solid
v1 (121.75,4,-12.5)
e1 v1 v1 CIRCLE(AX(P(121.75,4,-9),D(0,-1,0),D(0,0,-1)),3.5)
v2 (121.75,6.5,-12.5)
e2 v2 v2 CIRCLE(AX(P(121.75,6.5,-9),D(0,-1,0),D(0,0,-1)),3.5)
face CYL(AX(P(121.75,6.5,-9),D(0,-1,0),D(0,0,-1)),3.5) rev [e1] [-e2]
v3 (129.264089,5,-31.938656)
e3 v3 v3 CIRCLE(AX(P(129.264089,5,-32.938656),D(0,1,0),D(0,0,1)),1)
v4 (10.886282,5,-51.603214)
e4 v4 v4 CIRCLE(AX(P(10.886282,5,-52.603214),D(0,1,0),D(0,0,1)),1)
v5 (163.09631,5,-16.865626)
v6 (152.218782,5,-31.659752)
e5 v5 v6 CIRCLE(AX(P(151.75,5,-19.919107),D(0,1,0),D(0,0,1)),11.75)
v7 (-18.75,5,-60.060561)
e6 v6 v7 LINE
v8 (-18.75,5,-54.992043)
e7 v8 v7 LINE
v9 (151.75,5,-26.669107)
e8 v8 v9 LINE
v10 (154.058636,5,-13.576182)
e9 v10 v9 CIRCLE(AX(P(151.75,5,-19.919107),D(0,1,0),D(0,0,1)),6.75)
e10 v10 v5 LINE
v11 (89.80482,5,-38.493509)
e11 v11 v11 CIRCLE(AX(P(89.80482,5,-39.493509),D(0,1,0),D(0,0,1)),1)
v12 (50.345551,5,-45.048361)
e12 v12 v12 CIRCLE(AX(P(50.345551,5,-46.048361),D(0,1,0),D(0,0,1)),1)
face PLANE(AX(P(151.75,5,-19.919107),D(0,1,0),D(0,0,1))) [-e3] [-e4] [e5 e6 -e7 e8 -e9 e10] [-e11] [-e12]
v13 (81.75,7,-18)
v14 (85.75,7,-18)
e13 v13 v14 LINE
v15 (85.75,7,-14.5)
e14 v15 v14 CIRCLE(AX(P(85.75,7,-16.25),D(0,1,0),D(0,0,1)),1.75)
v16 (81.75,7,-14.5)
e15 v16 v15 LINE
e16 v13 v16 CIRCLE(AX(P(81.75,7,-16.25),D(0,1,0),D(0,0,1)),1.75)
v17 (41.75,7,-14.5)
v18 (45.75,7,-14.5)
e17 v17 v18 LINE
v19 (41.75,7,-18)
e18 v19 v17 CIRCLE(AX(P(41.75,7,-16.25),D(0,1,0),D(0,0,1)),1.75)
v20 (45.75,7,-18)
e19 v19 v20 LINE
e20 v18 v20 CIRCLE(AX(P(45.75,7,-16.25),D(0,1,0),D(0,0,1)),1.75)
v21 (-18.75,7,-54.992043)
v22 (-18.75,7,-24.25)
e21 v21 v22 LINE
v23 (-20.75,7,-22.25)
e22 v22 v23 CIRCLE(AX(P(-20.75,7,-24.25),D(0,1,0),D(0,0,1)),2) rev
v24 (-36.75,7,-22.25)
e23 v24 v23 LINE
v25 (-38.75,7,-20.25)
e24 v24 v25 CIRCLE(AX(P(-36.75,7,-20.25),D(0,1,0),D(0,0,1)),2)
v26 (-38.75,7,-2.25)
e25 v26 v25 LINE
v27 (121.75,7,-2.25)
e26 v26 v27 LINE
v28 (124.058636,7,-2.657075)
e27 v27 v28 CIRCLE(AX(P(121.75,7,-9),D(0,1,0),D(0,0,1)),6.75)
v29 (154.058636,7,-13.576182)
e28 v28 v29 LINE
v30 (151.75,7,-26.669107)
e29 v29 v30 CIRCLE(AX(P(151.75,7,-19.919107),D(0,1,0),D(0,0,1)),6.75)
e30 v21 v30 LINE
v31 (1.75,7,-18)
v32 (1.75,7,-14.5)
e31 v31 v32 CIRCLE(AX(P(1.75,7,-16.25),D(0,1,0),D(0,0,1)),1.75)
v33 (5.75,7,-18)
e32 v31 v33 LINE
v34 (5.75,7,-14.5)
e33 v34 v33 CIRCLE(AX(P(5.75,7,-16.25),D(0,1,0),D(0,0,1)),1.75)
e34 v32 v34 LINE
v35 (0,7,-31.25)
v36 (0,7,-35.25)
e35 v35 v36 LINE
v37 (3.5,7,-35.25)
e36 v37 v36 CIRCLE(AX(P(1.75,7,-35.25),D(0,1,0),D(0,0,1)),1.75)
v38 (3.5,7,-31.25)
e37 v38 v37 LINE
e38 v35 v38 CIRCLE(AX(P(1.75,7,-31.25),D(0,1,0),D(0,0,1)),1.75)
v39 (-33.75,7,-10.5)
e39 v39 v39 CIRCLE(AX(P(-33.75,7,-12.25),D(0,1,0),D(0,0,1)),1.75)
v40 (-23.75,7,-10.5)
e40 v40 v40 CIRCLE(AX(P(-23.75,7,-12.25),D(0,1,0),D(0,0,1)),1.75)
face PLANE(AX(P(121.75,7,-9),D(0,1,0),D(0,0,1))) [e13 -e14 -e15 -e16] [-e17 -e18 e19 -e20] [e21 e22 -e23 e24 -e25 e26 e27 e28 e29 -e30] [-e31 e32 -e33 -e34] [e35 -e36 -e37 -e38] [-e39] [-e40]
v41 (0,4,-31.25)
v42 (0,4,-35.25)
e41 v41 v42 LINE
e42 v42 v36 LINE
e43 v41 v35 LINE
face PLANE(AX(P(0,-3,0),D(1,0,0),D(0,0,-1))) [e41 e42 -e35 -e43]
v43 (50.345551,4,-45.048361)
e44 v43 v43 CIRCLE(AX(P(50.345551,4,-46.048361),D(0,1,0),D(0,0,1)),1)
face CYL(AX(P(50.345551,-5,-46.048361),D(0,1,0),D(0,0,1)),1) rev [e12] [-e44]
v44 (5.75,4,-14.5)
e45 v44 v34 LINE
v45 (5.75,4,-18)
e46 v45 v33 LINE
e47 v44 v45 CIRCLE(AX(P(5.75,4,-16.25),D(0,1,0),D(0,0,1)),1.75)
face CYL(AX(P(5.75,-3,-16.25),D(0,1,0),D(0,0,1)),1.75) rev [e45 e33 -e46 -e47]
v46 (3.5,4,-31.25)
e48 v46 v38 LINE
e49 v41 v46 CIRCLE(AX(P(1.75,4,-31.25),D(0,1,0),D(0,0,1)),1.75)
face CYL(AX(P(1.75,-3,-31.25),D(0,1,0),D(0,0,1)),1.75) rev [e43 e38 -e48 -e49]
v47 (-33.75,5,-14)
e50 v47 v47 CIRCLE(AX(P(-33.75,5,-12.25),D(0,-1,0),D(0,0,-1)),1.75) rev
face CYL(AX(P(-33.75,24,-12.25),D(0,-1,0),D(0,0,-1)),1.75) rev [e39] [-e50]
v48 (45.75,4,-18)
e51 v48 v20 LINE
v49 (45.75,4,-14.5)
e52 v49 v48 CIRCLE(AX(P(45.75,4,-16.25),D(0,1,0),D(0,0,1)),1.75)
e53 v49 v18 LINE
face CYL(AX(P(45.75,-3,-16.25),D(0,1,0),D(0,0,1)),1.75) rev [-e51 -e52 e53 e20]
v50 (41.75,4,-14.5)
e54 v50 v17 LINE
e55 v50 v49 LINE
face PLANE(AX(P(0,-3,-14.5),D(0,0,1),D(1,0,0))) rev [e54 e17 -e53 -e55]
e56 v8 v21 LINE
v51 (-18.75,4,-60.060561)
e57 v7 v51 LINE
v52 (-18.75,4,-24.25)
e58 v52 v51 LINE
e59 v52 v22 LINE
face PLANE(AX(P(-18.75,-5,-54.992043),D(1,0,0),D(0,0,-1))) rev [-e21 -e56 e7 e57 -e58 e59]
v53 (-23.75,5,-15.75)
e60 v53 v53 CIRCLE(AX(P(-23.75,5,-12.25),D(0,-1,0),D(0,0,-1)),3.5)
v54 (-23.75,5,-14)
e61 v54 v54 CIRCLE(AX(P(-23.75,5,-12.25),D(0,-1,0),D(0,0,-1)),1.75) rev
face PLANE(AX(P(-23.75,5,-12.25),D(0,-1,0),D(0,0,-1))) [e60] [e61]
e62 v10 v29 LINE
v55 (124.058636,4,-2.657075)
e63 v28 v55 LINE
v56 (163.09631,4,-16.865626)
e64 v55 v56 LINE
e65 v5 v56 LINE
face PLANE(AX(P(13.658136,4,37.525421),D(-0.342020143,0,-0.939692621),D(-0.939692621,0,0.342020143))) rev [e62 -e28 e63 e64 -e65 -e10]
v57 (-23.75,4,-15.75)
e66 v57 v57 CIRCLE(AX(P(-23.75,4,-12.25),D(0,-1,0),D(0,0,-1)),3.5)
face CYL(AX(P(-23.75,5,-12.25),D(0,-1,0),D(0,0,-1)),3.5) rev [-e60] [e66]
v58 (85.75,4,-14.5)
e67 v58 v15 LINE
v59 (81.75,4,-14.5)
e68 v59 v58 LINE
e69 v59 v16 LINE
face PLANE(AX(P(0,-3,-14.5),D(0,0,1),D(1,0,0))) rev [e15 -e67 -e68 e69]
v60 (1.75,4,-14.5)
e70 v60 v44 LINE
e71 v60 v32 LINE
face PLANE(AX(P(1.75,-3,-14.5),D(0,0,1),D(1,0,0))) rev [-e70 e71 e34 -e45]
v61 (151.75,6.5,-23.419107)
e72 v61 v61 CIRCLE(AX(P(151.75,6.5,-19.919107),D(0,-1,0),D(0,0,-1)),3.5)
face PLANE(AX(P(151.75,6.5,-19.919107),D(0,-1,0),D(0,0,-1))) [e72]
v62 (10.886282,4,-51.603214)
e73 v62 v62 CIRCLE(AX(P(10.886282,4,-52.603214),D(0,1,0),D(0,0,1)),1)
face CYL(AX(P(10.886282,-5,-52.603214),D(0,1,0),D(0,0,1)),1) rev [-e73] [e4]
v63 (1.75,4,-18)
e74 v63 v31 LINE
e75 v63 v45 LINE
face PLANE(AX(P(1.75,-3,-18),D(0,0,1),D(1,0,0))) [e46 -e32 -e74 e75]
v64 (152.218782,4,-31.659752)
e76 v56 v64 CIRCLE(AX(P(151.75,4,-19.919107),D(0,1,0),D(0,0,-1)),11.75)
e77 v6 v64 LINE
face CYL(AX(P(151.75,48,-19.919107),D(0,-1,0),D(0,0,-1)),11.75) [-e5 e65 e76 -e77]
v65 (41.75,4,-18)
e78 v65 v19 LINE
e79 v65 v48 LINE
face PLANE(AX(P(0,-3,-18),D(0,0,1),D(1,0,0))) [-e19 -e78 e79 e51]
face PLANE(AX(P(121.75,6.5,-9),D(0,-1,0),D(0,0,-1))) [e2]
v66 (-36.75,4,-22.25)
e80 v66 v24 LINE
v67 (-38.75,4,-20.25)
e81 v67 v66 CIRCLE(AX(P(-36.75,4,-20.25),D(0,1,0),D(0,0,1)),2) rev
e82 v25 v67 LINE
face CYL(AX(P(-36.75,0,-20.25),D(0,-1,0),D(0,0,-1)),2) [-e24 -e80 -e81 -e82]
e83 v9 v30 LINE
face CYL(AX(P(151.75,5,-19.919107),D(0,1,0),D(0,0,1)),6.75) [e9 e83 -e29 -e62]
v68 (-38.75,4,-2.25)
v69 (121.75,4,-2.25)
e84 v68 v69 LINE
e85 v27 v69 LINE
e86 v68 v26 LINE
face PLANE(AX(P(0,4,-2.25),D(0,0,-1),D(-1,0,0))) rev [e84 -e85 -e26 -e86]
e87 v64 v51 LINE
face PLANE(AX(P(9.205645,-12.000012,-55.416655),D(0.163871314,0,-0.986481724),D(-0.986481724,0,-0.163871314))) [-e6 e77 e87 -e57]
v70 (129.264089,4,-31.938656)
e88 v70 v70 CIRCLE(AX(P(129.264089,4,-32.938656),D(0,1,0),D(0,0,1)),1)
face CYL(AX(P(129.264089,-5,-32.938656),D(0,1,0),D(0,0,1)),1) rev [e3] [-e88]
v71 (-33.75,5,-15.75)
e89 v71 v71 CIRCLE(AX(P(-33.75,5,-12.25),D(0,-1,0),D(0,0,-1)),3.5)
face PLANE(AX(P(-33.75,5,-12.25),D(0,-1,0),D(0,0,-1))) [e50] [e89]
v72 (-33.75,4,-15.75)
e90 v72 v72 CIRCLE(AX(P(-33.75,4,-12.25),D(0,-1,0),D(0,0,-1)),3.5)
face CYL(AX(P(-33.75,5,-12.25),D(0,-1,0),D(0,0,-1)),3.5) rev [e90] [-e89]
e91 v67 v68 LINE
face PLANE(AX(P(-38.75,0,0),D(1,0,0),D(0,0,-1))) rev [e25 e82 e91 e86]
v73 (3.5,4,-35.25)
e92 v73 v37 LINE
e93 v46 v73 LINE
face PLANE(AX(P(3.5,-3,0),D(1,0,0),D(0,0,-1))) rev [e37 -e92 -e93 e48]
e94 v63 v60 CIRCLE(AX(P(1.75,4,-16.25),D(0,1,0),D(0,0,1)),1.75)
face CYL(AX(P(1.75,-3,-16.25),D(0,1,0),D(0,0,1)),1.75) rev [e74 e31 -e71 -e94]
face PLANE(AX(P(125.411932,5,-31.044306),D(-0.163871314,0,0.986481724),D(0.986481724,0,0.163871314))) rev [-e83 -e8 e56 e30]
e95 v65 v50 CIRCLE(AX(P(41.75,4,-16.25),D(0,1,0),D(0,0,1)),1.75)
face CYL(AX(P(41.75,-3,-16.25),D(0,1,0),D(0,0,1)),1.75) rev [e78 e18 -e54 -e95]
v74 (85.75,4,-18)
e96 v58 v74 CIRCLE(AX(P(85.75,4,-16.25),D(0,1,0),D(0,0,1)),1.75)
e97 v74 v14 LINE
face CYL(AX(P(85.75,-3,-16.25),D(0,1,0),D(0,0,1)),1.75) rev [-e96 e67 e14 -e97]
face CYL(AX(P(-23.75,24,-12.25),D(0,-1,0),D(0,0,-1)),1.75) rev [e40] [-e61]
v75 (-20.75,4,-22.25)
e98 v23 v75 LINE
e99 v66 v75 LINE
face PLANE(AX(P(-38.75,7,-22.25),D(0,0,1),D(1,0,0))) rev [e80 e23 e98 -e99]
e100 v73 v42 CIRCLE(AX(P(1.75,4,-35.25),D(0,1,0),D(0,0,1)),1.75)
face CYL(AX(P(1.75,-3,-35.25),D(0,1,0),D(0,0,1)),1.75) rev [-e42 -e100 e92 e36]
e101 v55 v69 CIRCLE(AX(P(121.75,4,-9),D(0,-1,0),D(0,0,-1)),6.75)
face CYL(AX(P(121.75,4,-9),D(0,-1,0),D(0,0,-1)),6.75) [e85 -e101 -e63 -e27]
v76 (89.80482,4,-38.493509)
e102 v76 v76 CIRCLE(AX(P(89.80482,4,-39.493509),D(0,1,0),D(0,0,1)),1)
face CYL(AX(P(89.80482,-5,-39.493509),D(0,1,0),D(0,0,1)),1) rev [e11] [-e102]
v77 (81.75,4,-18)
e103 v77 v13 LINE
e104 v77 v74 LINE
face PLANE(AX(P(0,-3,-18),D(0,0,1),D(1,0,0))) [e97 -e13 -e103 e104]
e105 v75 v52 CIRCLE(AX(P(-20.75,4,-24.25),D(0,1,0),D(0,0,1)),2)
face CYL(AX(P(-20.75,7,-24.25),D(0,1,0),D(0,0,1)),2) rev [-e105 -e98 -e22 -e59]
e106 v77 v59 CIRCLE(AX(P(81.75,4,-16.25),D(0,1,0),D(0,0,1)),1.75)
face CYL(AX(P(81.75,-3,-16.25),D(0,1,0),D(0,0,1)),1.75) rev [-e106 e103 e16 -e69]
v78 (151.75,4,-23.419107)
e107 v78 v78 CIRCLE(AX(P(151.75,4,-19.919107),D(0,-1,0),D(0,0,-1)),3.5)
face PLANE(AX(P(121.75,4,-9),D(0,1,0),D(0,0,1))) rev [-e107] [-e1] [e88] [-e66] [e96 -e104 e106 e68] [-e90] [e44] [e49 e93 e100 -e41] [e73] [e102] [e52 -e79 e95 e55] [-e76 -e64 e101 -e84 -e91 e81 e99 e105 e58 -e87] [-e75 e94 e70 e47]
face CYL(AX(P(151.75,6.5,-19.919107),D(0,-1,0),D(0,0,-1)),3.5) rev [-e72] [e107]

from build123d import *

# Parameters (mm, degrees)
SKETCH_1_W                = 35
SKETCH_1_H                = 55
EXTRUDE_1_DEPTH           = 1
EXTRUDE_2_DEPTH           = 3
SKETCH_3_R                = 5
CUT_EXTRUDE_1_DEPTH       = 169.569903897
SKETCH_4_R                = 4
CUT_EXTRUDE_2_DEPTH       = 2
SKETCH_5_R                = 2
CUT_EXTRUDE_3_DEPTH       = 2
EXTRUDE_START             = 7
EXTRUDE_3_DEPTH           = 7
CUT_EXTRUDE_START         = -1.5
SKETCH_9_W                = 10
SKETCH_9_H                = 26
CUT_EXTRUDE_4_DEPTH       = 168.318874833
SKETCH_10_R               = 1.5
CUT_EXTRUDE_5_DEPTH       = 194.595583627
EXTRUDE_4_DEPTH           = 3
SKETCH_13_W               = 334.012533363
SKETCH_13_H               = 161.456209481
CUT_EXTRUDE_6_DEPTH       = 10
SKETCH_14_R               = 3.5
CUT_EXTRUDE_7_DEPTH       = 2.5
SKETCH_15_R               = 5
CUT_EXTRUDE_8_DEPTH       = 179.854165453
EXTRUDE_START_2           = 16
EXTRUDE_5_DEPTH           = 16
EXTRUDE_6_DEPTH           = 7
SKETCH_19_W               = 10
SKETCH_19_H               = 26
CUT_EXTRUDE_9_DEPTH       = 180.209193181
SKETCH_20_R               = 1.5
CUT_EXTRUDE_10_DEPTH      = 175.844216376
THREAD_1_PITCH            = 0.6
CUT_EXTRUDE_11_DEPTH      = 181.709193232
SKETCH_22_W               = 13
SKETCH_22_H               = 1.5
CUT_EXTRUDE_12_DEPTH      = 7
SKETCH_23_R               = 5
EXTRUDE_7_DEPTH           = 2
CUT_EXTRUDE_START_2       = -3
CUT_EXTRUDE_15_DEPTH      = 177.762490825
SKETCH_25_R               = 7.5
CUT_EXTRUDE_16_DEPTH      = 4
CUT_EXTRUDE_17_DEPTH      = 10
SKETCH_27_R               = 1.75
CUT_EXTRUDE_18_DEPTH      = 10
CUT_EXTRUDE_19_DEPTH      = 180.762490825
CUT_EXTRUDE_19_DEPTH_BACK = 60
CUT_EXTRUDE_20_DEPTH      = 2
SKETCH_30_W               = 11.653427307
SKETCH_30_H               = 7.287785495
CUT_EXTRUDE_21_DEPTH      = 193.522031886
SKETCH_31_W               = 3.751946438
SKETCH_31_H               = 6.76496914
CUT_EXTRUDE_22_DEPTH      = 10
SKETCH_32_R               = 1
CUT_EXTRUDE_23_DEPTH      = 10
SKETCH_33_R               = 6.599468503
EXTRUDE_8_DEPTH           = 1
SKETCH_34_W               = 94.741371682
SKETCH_34_H               = 17.469135828
CUT_EXTRUDE_25_DEPTH      = 330
SKETCH_35_W               = 20
SKETCH_35_H               = 3
EXTRUDE_9_DEPTH           = 20
SKETCH_36_R               = 1.75
CUT_EXTRUDE_26_DEPTH      = 20
SKETCH_37_R               = 3.5
CUT_EXTRUDE_27_DEPTH      = 1
FILLET_1_R                = 2


with BuildPart() as part:
    # Sketch 1 → 凸台-拉伸1 (new body)
    with BuildSketch(Plane(origin=(0, 0, 0), x_dir=(1, 0, 0), z_dir=(0, 1, 0))):
        Rectangle(SKETCH_1_W, SKETCH_1_H)
    extrude(amount=EXTRUDE_1_DEPTH)

    # 草图2 → 凸台-拉伸2 (add)
    with BuildSketch(Plane(origin=(0, 1, 0), x_dir=(1, 0, 0), z_dir=(0, 1, 0))):
        with BuildLine():
            Line((106.75, -2.25), (106.75, 2.25))
            Line((106.75, 2.25), (121.75, 2.25))
            ThreePointArc((121.75, 2.25), (122.922125199, 2.352547667), (124.058635967, 2.65707481))
            Line((124.058635967, 2.65707481), (154.058635967, 13.576181838))
            ThreePointArc((154.058635967, 13.576181838), (158.397452333, 21.091232227), (151.75, 26.669107028))
            Line((151.75, 26.669107028), (-31.447415548, 57.101298968))
            ThreePointArc((-31.447415548, 57.101298968), (-37.800418235, 56.264673928), (-42.609265279, 52.029632639))
            Line((-42.609265279, 52.029632639), (-60.161792173, 23.605896086))
            ThreePointArc((-60.161792173, 23.605896086), (-61.717833724, 20.073278016), (-62.25, 16.25))
            Line((-62.25, 16.25), (-62.25, -16.25))
            ThreePointArc((-62.25, -16.25), (-61.717833724, -20.073278016), (-60.161792173, -23.605896086))
            Line((-60.161792173, -23.605896086), (-42.609265279, -52.029632639))
            ThreePointArc((-42.609265279, -52.029632639), (-37.800418235, -56.264673928), (-31.447415548, -57.101298968))
            Line((-31.447415548, -57.101298968), (151.75, -26.669107028))
            ThreePointArc((151.75, -26.669107028), (158.397452333, -21.091232227), (154.058635967, -13.576181838))
            Line((154.058635967, -13.576181838), (124.058635967, -2.65707481))
            ThreePointArc((124.058635967, -2.65707481), (122.922125199, -2.352547667), (121.75, -2.25))
            Line((121.75, -2.25), (106.75, -2.25))
        make_face()
    extrude(amount=EXTRUDE_2_DEPTH)

    # 草图3 → 切除-拉伸1 (cut, through all)
    with BuildSketch(Plane(origin=(0, 4, 0), x_dir=(1, 0, 0), z_dir=(0, 1, 0))):
        with Locations(Location((-48.25, 16.25, 0), (0, 0, 270))):
            Circle(SKETCH_3_R)
        with Locations(Location((-48.25, -16.25, 0), (0, 0, 270))):
            Circle(SKETCH_3_R)
    extrude(amount=-CUT_EXTRUDE_1_DEPTH, mode=Mode.SUBTRACT)

    # 草图4 → 切除-拉伸2 (cut)
    with BuildSketch(Plane(origin=(0, 4, 0), x_dir=(1, 0, 0), z_dir=(0, 1, 0))):
        with Locations(Location((-33.25, 46.25, 0), (0, 0, 270))):
            Circle(SKETCH_4_R)
        with Locations(Location((-33.25, -46.25, 0), (0, 0, 270))):
            Circle(SKETCH_4_R)
    extrude(amount=-CUT_EXTRUDE_2_DEPTH, mode=Mode.SUBTRACT)

    # 草图5 → 切除-拉伸3 (cut)
    with BuildSketch(Plane(origin=(0, 4, 0), x_dir=(1, 0, 0), z_dir=(0, 1, 0))):
        with Locations(Location((121.75, 9, 0), (0, 0, 270))):
            Circle(SKETCH_5_R)
        with Locations(Location((121.75, -9, 0), (0, 0, 270))):
            Circle(SKETCH_5_R)
        with Locations(Location((151.75, 19.919107028, 0), (0, 0, 270))):
            Circle(SKETCH_5_R)
        with Locations(Location((151.75, -19.919107028, 0), (0, 0, 270))):
            Circle(SKETCH_5_R)
    extrude(amount=-CUT_EXTRUDE_3_DEPTH, mode=Mode.SUBTRACT)

    # 草图8 → 凸台-拉伸3 (add)
    with BuildSketch(Plane.XZ.offset(-1).offset(EXTRUDE_START)):
        with BuildLine():
            Line((-26.75, -26.25), (-39.75, -26.25))
            Line((-39.75, -26.25), (-39.75, -55.124119675))
            ThreePointArc((-39.75, -55.124119675), (-35.798281322, -56.950759894), (-31.447415548, -57.101298968))
            Line((-31.447415548, -57.101298968), (-26.75, -56.320978726))
            Line((-26.75, -56.320978726), (-26.75, -26.25))
        make_face()
    extrude_3 = extrude(amount=-EXTRUDE_3_DEPTH)

    # 镜向1: 凸台-拉伸3 across plane
    add(extrude_3.mirror(Plane.XY))

    # 草图9 → 切除-拉伸4 (cut, through all)
    with BuildSketch(Plane.XZ.offset(6).offset(CUT_EXTRUDE_START)):
        with Locations((-33.25, -40.75)):
            Rectangle(SKETCH_9_W, SKETCH_9_H)
    cut_extrude_4 = extrude(amount=-CUT_EXTRUDE_4_DEPTH, mode=Mode.SUBTRACT)

    # 镜向2: 切除-拉伸4 across plane
    add(cut_extrude_4.mirror(Plane.XY), mode=Mode.SUBTRACT)

    # 草图10 → 切除-拉伸5 (cut, through all)
    with BuildSketch(Plane.XY.offset(-53.75)):
        with Locations((-33.25, -1.5)):
            Circle(SKETCH_10_R)
    cut_extrude_5 = extrude(amount=-CUT_EXTRUDE_5_DEPTH, mode=Mode.SUBTRACT)

    # 镜向3: 切除-拉伸5 across plane
    add(cut_extrude_5.mirror(Plane.XY), mode=Mode.SUBTRACT)

    # 草图12 → 凸台-拉伸4 (add)
    with BuildSketch(Plane(origin=(0, 4, 0), x_dir=(1, 0, 0), z_dir=(0, 1, 0))):
        with BuildLine():
            Line((152.536154407, 34.648141662), (-30.136445037, 64.993152763))
            ThreePointArc((-30.136445037, 64.993152763), (-32.296727103, 65.226071005), (-34.469475839, 65.210824842))
            Line((-34.469475839, 65.210824842), (-60.161792173, 23.605896086))
            ThreePointArc((-60.161792173, 23.605896086), (-61.717833724, 20.073278016), (-62.25, 16.25))
            Line((-62.25, 16.25), (-62.25, 2.25))
            Line((-62.25, 2.25), (121.75, 2.25))
            ThreePointArc((121.75, 2.25), (122.922125199, 2.352547667), (124.058635967, 2.65707481))
            Line((124.058635967, 2.65707481), (166.382589153, 18.061733966))
            ThreePointArc((166.382589153, 18.061733966), (163.073058037, 29.371665237), (152.536154407, 34.648141662))
        make_face()
    extrude(amount=EXTRUDE_4_DEPTH)

    # 草图13 → 切除-拉伸6 (cut)
    with BuildSketch(Plane.XZ.offset(-4)):
        with Locations((47.836319436, 6.16656882)):
            Rectangle(SKETCH_13_W, SKETCH_13_H)
    extrude(amount=CUT_EXTRUDE_6_DEPTH, mode=Mode.SUBTRACT)

    # 草图14 → 切除-拉伸7 (cut)
    with BuildSketch(Plane.XZ.offset(-4)):
        with Locations(Location((151.75, -19.919107028, 0), (0, 0, 270))):
            Circle(SKETCH_14_R)
        with Locations(Location((121.75, -9, 0), (0, 0, 270))):
            Circle(SKETCH_14_R)
    extrude(amount=-CUT_EXTRUDE_7_DEPTH, mode=Mode.SUBTRACT)

    # 草图15 → 切除-拉伸8 (cut, through all)
    with BuildSketch(Plane.XZ.offset(-4)):
        with Locations(Location((-48.25, -16.25, 0), (0, 0, 270))):
            Circle(SKETCH_15_R)
    extrude(amount=-CUT_EXTRUDE_8_DEPTH, mode=Mode.SUBTRACT)

    # 草图17 → 凸台-拉伸5 (add)
    with BuildSketch(Plane.XZ.offset(-4).offset(EXTRUDE_START_2)):
        with BuildLine():
            Line((-30.628058978, -62.03370759), (152.218782473, -31.659751942))
            ThreePointArc((152.218782473, -31.659751942), (161.216553887, -26.879484712), (163.096310198, -16.865626245))
            Line((163.096310198, -16.865626245), (166.382589153, -18.061733966))
            ThreePointArc((166.382589153, -18.061733966), (163.073058037, -29.371665237), (152.536154407, -34.648141662))
            Line((152.536154407, -34.648141662), (-30.136445037, -64.993152763))
            ThreePointArc((-30.136445037, -64.993152763), (-32.296727103, -65.226071005), (-34.469475839, -65.210824842))
            Line((-34.469475839, -65.210824842), (-36.504423199, -61.915526791))
            ThreePointArc((-36.504423199, -61.915526791), (-33.571714316, -62.246765295), (-30.628058978, -62.03370759))
        make_face()
    extrude(amount=-EXTRUDE_5_DEPTH)

    # 草图18 → 凸台-拉伸6 (add)
    with BuildSketch(Plane(origin=(0, 7, 0), x_dir=(1, 0, 0), z_dir=(0, 1, 0))):
        with BuildLine():
            Line((-39.75, 56.65979236), (-39.75, 26.25))
            Line((-39.75, 26.25), (-26.75, 26.25))
            Line((-26.75, 26.25), (-26.75, 64.430606916))
            Line((-26.75, 64.430606916), (-30.136445037, 64.993152763))
            ThreePointArc((-30.136445037, 64.993152763), (-32.296727103, 65.226071005), (-34.469475839, 65.210824842))
            Line((-34.469475839, 65.210824842), (-39.75, 56.65979236))
        make_face()
    extrude(amount=EXTRUDE_6_DEPTH)

    # 草图19 → 切除-拉伸9 (cut, through all)
    with BuildSketch(Plane(origin=(0, 14, 0), x_dir=(1, 0, 0), z_dir=(0, 1, 0)).offset(CUT_EXTRUDE_START)):
        with Locations((-33.25, 40.75)):
            Rectangle(SKETCH_19_W, SKETCH_19_H)
    extrude(amount=-CUT_EXTRUDE_9_DEPTH, mode=Mode.SUBTRACT)

    # 草图20 → 切除-拉伸10 (cut, through all)
    with BuildSketch(Plane.XY.offset(-53.75)):
        with Locations((-33.25, 9.5)):
            Circle(SKETCH_20_R)
    extrude(amount=-CUT_EXTRUDE_10_DEPTH, mode=Mode.SUBTRACT)

    # 螺纹线1: the profile of Sketch 1 2 profile screwed along a right-hand helix of 25 turns, 6 arcs to a turn; built about Z, then put on its axis
    thread_1_z = Axis((0, 0, 0), (0, 0, 1))
    thread_1_corners = [(1.4997, 0, -0.000173205), (1.824759525, 0, 0.187499999), (1.824759525, 0, 0.262499999), (1.4997, 0, 0.450173203)]
    with BuildLine(mode=Mode.PRIVATE) as thread_1_profile:
        Line(thread_1_corners[0], thread_1_corners[1])
        Line(thread_1_corners[1], thread_1_corners[2])
        Line(thread_1_corners[2], thread_1_corners[3])
        Line(thread_1_corners[3], thread_1_corners[0])
    thread_1_cap = Face(thread_1_profile.wire())
    thread_1_turn_angles = [0, 30, 60, 90, 120, 150, 180, 210, 240, 270, 300, 330, 360]
    thread_1_turn_weights = [1, 0.8660254037844387, 1, 0.8660254037844387, 1, 0.8660254037844387, 1, 0.8660254037844387, 1, 0.8660254037844387, 1, 0.8660254037844387, 1]
    thread_1_turn_rails = [Edge.make_bspline([Vector(p[0], p[1], 0).rotate(thread_1_z, thread_1_turn_angles[k]) / thread_1_turn_weights[k] + Vector(0, 0, p[2] + THREAD_1_PITCH * thread_1_turn_angles[k] / 360) for k in range(13)], [0, 0, 0, 1, 1, 2, 2, 3, 3, 4, 4, 5, 5, 6, 6, 6], 2, thread_1_turn_weights) for p in thread_1_corners]
    thread_1_turn_sides = [Face.make_surface_from_curves(thread_1_turn_rails[p[0]], thread_1_turn_rails[p[1]]) for p in [(0, 1), (1, 2), (2, 3), (3, 0)]]
    thread_1 = Plane(origin=(-33.25, 9.5, -53.75), x_dir=(-1, 0, 0), z_dir=(0, 0, -1)) * Solid(Shell([*[p.moved(Location((0, 0, THREAD_1_PITCH * i))) for i in range(25) for p in thread_1_turn_sides], thread_1_cap, thread_1_cap.rotate(thread_1_z, 9000).moved(Location((0, 0, THREAD_1_PITCH * 9000 / 360)))]))
    add(thread_1, mode=Mode.SUBTRACT)

    # 草图21 → 切除-拉伸11 (cut, through all)
    with BuildSketch(Plane(origin=(0, 14, 0), x_dir=(1, 0, 0), z_dir=(0, 1, 0))):
        with BuildLine():
            Line((-39.75, 27.75), (-26.75, 27.75))
            Line((-26.75, 27.75), (-26.75, 64.430606916))
            Line((-26.75, 64.430606916), (-30.136445037, 64.993152763))
            ThreePointArc((-30.136445037, 64.993152763), (-32.296727103, 65.226071005), (-34.469475839, 65.210824842))
            Line((-34.469475839, 65.210824842), (-39.75, 56.65979236))
            Line((-39.75, 56.65979236), (-39.75, 27.75))
        make_face()
    extrude(amount=-CUT_EXTRUDE_11_DEPTH, mode=Mode.SUBTRACT)

    # 草图22 → 切除-拉伸12 (cut)
    with BuildSketch(Plane(origin=(0, 14, 0), x_dir=(1, 0, 0), z_dir=(0, 1, 0))):
        with Locations((-33.25, 27)):
            Rectangle(SKETCH_22_W, SKETCH_22_H)
    extrude(amount=-CUT_EXTRUDE_12_DEPTH, mode=Mode.SUBTRACT)

    # 草图23 → 凸台-拉伸7 (add)
    with BuildSketch(Plane(origin=(0, 7, 0), x_dir=(1, 0, 0), z_dir=(0, 1, 0))):
        with BuildLine():
            Line((-26.75, 27.75), (-39.75, 27.75))
            Line((-39.75, 27.75), (-39.75, 56.65979236))
            Line((-39.75, 56.65979236), (-60.161792173, 23.605896086))
            ThreePointArc((-60.161792173, 23.605896086), (-61.717833724, 20.073278016), (-62.25, 16.25))
            Line((-62.25, 16.25), (-62.25, 2.25))
            Line((-62.25, 2.25), (-18.75, 2.25))
            Line((-18.75, 2.25), (-18.75, 63.101671489))
            Line((-18.75, 63.101671489), (-26.75, 64.430606916))
            Line((-26.75, 64.430606916), (-26.75, 27.75))
        make_face()
        with Locations(Location((-48.25, 16.25, 0), (0, 0, 90))):
            Circle(SKETCH_23_R, mode=Mode.SUBTRACT)
    extrude(amount=EXTRUDE_7_DEPTH)

    # 草图24 → 切除-拉伸15 (cut, through all)
    with BuildSketch(Plane(origin=(0, 9, 0), x_dir=(1, 0, 0), z_dir=(0, 1, 0)).offset(CUT_EXTRUDE_START_2)):
        Polygon((-45.75, 46.034880297), (-45.75, 27.75), (-39.75, 27.75), (-39.75, 56.65979236), (-45.75, 46.943674541), align=None)
        Polygon((-26.75, 64.430606916), (-26.75, 27.75), (-20.75, 27.75), (-20.75, 63.433905346), align=None)
    extrude(amount=-CUT_EXTRUDE_15_DEPTH, mode=Mode.SUBTRACT)

    # 草图25 → 切除-拉伸16 (cut)
    with BuildSketch(Plane.XZ.offset(-4)):
        with Locations(Location((-48.25, -16.25, 0), (0, 0, 270))):
            Circle(SKETCH_25_R)
    extrude(amount=-CUT_EXTRUDE_16_DEPTH, mode=Mode.SUBTRACT)

    # 草图26 → 切除-拉伸17 (cut)
    with BuildSketch(Plane(origin=(0, 7, 0), x_dir=(1, 0, 0), z_dir=(0, 1, 0))):
        with BuildLine():
            Line((3.5, 31.25), (3.5, 35.25))
            ThreePointArc((3.5, 35.25), (1.75, 37), (0, 35.25))
            Line((0, 35.25), (0, 31.25))
            ThreePointArc((0, 31.25), (1.75, 29.5), (3.5, 31.25))
        make_face()
        with BuildLine():
            ThreePointArc((41.75, 18), (40.512563133, 17.487436867), (40, 16.25))
            Line((40, 16.25), (47.5, 16.25))
            ThreePointArc((47.5, 16.25), (46.987436867, 17.487436867), (45.75, 18))
            Line((45.75, 18), (41.75, 18))
        make_face()
        with BuildLine():
            Line((47.5, 16.25), (40, 16.25))
            ThreePointArc((40, 16.25), (40.512563133, 15.012563133), (41.75, 14.5))
            Line((41.75, 14.5), (45.75, 14.5))
            ThreePointArc((45.75, 14.5), (46.987436867, 15.012563133), (47.5, 16.25))
        make_face()
        with BuildLine():
            Line((81.75, 14.5), (85.75, 14.5))
            ThreePointArc((85.75, 14.5), (87.5, 16.25), (85.75, 18))
            Line((85.75, 18), (81.75, 18))
            ThreePointArc((81.75, 18), (80, 16.25), (81.75, 14.5))
        make_face()
        with BuildLine():
            Line((1.75, 18), (5.75, 18))
            ThreePointArc((5.75, 18), (7.5, 16.25), (5.75, 14.5))
            Line((5.75, 14.5), (1.75, 14.5))
            ThreePointArc((1.75, 14.5), (0, 16.25), (1.75, 18))
        make_face()
    extrude(amount=-CUT_EXTRUDE_17_DEPTH, mode=Mode.SUBTRACT)

    # 草图27 → 切除-拉伸18 (cut)
    with BuildSketch(Plane.XZ.offset(-6)):
        with Locations(Location((-42.75, -32.75, 0), (0, 0, 270))):
            Circle(SKETCH_27_R)
        with Locations(Location((-42.75, -42.75, 0), (0, 0, 270))):
            Circle(SKETCH_27_R)
        with Locations(Location((-23.75, -32.75, 0), (0, 0, 270))):
            Circle(SKETCH_27_R)
        with Locations(Location((-23.75, -42.75, 0), (0, 0, 270))):
            Circle(SKETCH_27_R)
    extrude(amount=-CUT_EXTRUDE_18_DEPTH, mode=Mode.SUBTRACT)

    # 草图28 → 切除-拉伸19 (cut, two sides: drawn at the far end of the back side and taken through both)
    with BuildSketch(Plane.XZ.offset(12).offset(-CUT_EXTRUDE_19_DEPTH_BACK)):
        with BuildLine():
            Line((152.218782473, -31.659751942), (-20.75, -60.392794775))
            Line((-20.75, -60.392794775), (-20.75, -63.433905346))
            Line((-20.75, -63.433905346), (152.536154407, -34.648141662))
            ThreePointArc((152.536154407, -34.648141662), (163.073058037, -29.371665237), (166.382589153, -18.061733966))
            Line((166.382589153, -18.061733966), (163.096310198, -16.865626245))
            ThreePointArc((163.096310198, -16.865626245), (161.216553887, -26.879484712), (152.218782473, -31.659751942))
        make_face()
        Polygon((-26.75, -61.389496345), (-26.75, -64.430606916), (-20.75, -63.433905346), (-20.75, -60.392794775), align=None)
    extrude(amount=CUT_EXTRUDE_19_DEPTH + CUT_EXTRUDE_19_DEPTH_BACK, mode=Mode.SUBTRACT)

    # 草图29 → 切除-拉伸20 (cut)
    with BuildSketch(Plane.XZ.offset(-4).offset(CUT_EXTRUDE_START_2)):
        with BuildLine():
            Line((-18.75, -60.060560918), (152.218782473, -31.659751942))
            ThreePointArc((152.218782473, -31.659751942), (161.216553887, -26.879484712), (163.096310198, -16.865626245))
            Line((163.096310198, -16.865626245), (154.058635967, -13.576181838))
            ThreePointArc((154.058635967, -13.576181838), (158.397452333, -21.091232227), (151.75, -26.669107028))
            Line((151.75, -26.669107028), (-18.75, -54.9920433))
            Line((-18.75, -54.9920433), (-18.75, -60.060560918))
        make_face()
    extrude(amount=CUT_EXTRUDE_20_DEPTH, mode=Mode.SUBTRACT)

    # 草图30 → 切除-拉伸21 (cut, through all)
    with BuildSketch(Plane(origin=(-18.75, 0, 0), x_dir=(0, 0, -1), z_dir=(1, 0, 0))):
        with Locations((60.818756954, 8.643892748)):
            Rectangle(SKETCH_30_W, SKETCH_30_H)
    extrude(amount=-CUT_EXTRUDE_21_DEPTH, mode=Mode.SUBTRACT)

    # 草图31 → 切除-拉伸22 (cut)
    with BuildSketch(Plane(origin=(0, 5, 0), x_dir=(1, 0, 0), z_dir=(0, 1, 0))):
        with Locations((-20.625973219, 58.37452787)):
            Rectangle(SKETCH_31_W, SKETCH_31_H)
    extrude(amount=-CUT_EXTRUDE_22_DEPTH, mode=Mode.SUBTRACT)

    # 草图32 → 切除-拉伸23 (cut)
    with BuildSketch(Plane(origin=(0, 5, 0), x_dir=(1, 0, 0), z_dir=(0, 1, 0))):
        with BuildLine():
            ThreePointArc((11.886282262, 52.603213934), (10.968496238, 53.599828635), (9.899800538, 52.767085248))
            Line((9.899800538, 52.767085248), (11.872763986, 52.43934262))
            ThreePointArc((11.872763986, 52.43934262), (11.882896963, 52.520999958), (11.886282262, 52.603213934))
        make_face()
        with BuildLine():
            Line((11.872763986, 52.43934262), (9.899800538, 52.767085248))
            ThreePointArc((9.899800538, 52.767085248), (10.722410948, 51.61673221), (11.872763986, 52.43934262))
        make_face()
        with BuildLine():
            ThreePointArc((51.345551236, 46.04836138), (50.427765212, 47.044976081), (49.359069512, 46.212232694))
            Line((49.359069512, 46.212232694), (51.332032961, 45.884490066))
            ThreePointArc((51.332032961, 45.884490066), (51.342165937, 45.966147404), (51.345551236, 46.04836138))
        make_face()
        with BuildLine():
            Line((51.332032961, 45.884490066), (49.359069512, 46.212232694))
            ThreePointArc((49.359069512, 46.212232694), (50.181679923, 45.061879655), (51.332032961, 45.884490066))
        make_face()
        with Locations(Location((89.804820211, 39.493508826, 0), (0, 0, 270))):
            Circle(SKETCH_32_R)
        with Locations(Location((129.264089185, 32.938656271, 0), (0, 0, 270))):
            Circle(SKETCH_32_R)
    extrude(amount=-CUT_EXTRUDE_23_DEPTH, mode=Mode.SUBTRACT)

    # 草图33 → 凸台-拉伸8 (add)
    with BuildSketch(Plane(origin=(0, 9, 0), x_dir=(1, 0, 0), z_dir=(0, 1, 0))):
        with Locations((-48.25, 16.25)):
            Circle(SKETCH_33_R)
    extrude(amount=-EXTRUDE_8_DEPTH)

    # 草图34 → 切除-拉伸25 (cut)
    with BuildSketch(Plane(origin=(-18.75, 0, 0), x_dir=(0, 0, -1), z_dir=(1, 0, 0))):
        with Locations((27.138654338, 6.617464179)):
            Rectangle(SKETCH_34_W, SKETCH_34_H)
    extrude(amount=-CUT_EXTRUDE_25_DEPTH, mode=Mode.SUBTRACT)

    # 草图35 → 凸台-拉伸9 (add)
    with BuildSketch(Plane.ZY.offset(18.75)):
        with Locations((-12.25, 5.5)):
            Rectangle(SKETCH_35_W, SKETCH_35_H)
    extrude(amount=EXTRUDE_9_DEPTH)

    # 草图36 → 切除-拉伸26 (cut)
    with BuildSketch(Plane.XZ.offset(-4)):
        with BuildLine():
            ThreePointArc((-22, -12.25), (-23.75, -10.5), (-25.5, -12.25))
            Line((-25.5, -12.25), (-22, -12.25))
        make_face()
        with BuildLine():
            Line((-22, -12.25), (-25.5, -12.25))
            ThreePointArc((-25.5, -12.25), (-23.75, -14), (-22, -12.25))
        make_face()
        with Locations(Location((-33.75, -12.25, 0), (0, 0, 270))):
            Circle(SKETCH_36_R)
    extrude(amount=-CUT_EXTRUDE_26_DEPTH, mode=Mode.SUBTRACT)

    # 草图37 → 切除-拉伸27 (cut)
    with BuildSketch(Plane.XZ.offset(-4)):
        with Locations(Location((-33.75, -12.25, 0), (0, 0, 270))):
            Circle(SKETCH_37_R)
        with Locations(Location((-23.75, -12.25, 0), (0, 0, 270))):
            Circle(SKETCH_37_R)
    extrude(amount=-CUT_EXTRUDE_27_DEPTH, mode=Mode.SUBTRACT)

    # 圆角1
    fillet_1_edges = [part.edges().sort_by_distance(p)[0] for p in [
        (-18.75, 5.5, -22.25),
        (-38.75, 5.5, -22.25),
    ]]
    fillet(fillet_1_edges, radius=FILLET_1_R)


solid = part.part
